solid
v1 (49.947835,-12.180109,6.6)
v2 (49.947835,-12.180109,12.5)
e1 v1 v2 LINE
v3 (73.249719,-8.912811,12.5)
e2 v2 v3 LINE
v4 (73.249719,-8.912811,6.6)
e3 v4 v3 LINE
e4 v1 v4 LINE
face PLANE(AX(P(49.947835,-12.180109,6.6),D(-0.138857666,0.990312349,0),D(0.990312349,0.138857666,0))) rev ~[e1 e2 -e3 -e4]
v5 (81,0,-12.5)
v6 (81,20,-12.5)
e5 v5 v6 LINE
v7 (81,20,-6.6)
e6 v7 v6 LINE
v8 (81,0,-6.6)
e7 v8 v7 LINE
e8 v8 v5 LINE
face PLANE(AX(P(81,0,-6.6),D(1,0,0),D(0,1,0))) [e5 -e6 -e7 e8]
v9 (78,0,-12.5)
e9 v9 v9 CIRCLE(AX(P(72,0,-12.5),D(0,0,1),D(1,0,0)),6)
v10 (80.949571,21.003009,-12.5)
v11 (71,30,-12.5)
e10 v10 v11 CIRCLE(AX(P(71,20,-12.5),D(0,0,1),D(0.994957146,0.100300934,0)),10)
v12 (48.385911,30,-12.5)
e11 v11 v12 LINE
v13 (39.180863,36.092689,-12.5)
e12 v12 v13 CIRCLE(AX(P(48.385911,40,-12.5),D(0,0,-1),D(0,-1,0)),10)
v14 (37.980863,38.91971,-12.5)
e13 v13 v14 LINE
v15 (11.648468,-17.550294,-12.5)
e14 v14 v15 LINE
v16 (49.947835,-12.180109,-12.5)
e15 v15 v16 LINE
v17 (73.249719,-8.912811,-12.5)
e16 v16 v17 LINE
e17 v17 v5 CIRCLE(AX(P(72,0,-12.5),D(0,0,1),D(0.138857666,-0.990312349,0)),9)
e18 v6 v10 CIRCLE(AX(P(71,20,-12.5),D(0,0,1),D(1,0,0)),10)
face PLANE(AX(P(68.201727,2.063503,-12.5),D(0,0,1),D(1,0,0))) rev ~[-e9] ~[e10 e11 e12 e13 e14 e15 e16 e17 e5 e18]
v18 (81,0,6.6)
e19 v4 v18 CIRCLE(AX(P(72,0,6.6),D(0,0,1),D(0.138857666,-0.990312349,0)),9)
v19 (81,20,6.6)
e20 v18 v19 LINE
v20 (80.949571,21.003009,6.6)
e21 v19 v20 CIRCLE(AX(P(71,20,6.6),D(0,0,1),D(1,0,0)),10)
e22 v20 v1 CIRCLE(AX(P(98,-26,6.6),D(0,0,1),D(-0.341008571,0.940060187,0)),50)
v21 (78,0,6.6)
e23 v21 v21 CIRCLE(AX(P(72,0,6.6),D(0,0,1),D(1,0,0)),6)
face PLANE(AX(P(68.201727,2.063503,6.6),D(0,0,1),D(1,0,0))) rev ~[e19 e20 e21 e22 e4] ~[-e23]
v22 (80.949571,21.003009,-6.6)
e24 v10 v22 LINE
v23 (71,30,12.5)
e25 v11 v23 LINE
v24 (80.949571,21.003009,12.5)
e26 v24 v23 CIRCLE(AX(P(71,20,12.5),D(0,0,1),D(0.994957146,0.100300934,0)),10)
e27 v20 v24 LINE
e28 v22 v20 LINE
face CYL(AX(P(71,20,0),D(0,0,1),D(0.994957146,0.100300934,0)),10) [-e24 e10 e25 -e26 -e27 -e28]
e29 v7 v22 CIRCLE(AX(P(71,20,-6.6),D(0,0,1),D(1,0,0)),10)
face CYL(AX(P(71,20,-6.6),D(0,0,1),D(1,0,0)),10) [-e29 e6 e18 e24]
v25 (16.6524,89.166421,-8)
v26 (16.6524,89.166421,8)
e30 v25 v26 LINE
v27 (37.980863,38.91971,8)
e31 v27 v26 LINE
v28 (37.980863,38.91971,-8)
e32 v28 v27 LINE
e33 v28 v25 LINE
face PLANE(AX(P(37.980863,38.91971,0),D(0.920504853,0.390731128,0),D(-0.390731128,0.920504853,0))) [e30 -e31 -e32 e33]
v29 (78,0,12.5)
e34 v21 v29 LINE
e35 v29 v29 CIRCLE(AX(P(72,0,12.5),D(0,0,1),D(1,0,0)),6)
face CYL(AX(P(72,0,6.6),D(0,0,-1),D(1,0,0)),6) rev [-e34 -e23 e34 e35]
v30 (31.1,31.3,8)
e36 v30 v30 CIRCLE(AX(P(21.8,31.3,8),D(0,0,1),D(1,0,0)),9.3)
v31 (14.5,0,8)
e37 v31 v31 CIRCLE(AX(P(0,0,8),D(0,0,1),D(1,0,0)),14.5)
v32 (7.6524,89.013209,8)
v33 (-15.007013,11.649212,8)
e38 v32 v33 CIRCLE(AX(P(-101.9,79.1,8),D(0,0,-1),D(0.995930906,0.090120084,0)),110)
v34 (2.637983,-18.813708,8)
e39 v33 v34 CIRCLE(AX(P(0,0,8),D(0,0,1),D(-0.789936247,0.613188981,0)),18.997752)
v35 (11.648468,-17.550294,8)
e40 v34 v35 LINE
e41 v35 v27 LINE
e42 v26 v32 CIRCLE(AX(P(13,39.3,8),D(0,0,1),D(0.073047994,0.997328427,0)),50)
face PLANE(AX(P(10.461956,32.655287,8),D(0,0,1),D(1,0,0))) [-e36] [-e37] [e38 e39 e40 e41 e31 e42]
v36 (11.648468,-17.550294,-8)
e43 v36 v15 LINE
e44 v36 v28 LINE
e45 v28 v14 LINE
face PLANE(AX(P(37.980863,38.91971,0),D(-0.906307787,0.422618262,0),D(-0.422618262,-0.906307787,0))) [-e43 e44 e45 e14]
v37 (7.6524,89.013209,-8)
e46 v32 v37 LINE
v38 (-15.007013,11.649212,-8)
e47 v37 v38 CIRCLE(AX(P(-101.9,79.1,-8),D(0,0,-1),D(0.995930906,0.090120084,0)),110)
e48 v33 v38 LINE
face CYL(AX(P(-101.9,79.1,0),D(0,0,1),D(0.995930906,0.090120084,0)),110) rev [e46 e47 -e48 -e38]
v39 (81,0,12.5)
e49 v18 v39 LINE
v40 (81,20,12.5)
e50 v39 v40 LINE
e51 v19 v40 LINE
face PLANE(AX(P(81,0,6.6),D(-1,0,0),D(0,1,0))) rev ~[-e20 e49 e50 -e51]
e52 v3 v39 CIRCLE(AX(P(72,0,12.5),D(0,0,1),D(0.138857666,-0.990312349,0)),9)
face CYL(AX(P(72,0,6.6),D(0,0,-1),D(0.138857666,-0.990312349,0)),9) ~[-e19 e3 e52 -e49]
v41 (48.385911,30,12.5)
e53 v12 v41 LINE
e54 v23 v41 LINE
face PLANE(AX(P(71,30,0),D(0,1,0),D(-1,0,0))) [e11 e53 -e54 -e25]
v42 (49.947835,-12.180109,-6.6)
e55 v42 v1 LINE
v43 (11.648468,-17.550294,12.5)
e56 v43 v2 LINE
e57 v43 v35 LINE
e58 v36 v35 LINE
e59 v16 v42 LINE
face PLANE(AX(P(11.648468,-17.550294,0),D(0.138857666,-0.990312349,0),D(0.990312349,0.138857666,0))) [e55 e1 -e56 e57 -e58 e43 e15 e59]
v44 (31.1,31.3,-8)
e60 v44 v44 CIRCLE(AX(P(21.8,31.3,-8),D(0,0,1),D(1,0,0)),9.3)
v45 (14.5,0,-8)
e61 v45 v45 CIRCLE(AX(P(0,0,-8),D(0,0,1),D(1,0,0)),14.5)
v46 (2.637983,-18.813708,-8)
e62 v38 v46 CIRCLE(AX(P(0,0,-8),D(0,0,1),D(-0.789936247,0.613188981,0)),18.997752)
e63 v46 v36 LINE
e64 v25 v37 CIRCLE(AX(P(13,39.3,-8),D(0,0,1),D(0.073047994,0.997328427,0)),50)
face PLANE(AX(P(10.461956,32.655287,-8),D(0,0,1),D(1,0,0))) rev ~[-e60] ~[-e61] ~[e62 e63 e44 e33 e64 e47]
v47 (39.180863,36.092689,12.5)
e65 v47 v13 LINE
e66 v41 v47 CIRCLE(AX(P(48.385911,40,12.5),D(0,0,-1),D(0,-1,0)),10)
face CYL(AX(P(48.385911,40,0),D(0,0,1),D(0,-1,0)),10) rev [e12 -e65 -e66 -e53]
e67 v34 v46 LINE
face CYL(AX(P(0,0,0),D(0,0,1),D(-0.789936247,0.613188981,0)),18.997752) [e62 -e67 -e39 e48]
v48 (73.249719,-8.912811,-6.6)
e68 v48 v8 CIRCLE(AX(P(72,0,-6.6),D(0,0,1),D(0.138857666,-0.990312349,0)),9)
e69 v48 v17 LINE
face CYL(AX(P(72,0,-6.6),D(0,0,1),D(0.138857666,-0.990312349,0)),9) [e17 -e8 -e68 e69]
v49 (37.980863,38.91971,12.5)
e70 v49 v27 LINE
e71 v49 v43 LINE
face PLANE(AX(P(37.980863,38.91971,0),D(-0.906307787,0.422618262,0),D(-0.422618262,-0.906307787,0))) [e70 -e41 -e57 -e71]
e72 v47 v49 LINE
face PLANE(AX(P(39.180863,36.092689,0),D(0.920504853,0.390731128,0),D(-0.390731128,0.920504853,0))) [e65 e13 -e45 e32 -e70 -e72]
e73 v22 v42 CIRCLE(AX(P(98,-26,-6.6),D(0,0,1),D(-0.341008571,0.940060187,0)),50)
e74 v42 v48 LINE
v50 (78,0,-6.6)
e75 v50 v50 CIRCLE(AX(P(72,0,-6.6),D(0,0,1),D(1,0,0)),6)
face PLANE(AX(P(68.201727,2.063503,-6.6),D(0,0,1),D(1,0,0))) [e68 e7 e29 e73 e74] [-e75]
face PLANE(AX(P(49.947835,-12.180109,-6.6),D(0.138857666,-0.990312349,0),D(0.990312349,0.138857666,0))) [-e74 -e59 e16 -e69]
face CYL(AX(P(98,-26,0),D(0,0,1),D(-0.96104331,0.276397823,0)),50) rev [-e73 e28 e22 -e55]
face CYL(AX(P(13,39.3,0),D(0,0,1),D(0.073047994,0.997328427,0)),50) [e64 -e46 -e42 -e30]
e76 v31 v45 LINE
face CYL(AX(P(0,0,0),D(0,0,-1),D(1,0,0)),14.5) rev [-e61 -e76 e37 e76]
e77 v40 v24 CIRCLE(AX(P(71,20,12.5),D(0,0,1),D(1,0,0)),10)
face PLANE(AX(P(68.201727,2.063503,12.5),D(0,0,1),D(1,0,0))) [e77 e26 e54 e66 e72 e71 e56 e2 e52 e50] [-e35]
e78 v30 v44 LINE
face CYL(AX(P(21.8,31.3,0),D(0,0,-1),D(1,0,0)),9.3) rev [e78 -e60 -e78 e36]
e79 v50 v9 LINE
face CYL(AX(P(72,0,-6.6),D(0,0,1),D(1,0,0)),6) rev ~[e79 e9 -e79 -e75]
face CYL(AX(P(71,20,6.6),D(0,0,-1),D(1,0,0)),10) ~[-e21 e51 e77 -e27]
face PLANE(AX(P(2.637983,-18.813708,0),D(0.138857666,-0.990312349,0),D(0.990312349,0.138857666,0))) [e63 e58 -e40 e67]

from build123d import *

# Parameters (mm, degrees)
F0_R     = 14.5
F0_R_2   = 9.3
F1_DEPTH = 8
F2_DEPTH = 12.5
F0_R_3   = 6
F3_DEPTH = 6.6
F4_DEPTH = 5.9
F5_DEPTH = 5.9


with BuildPart() as f1:
    # F0 (on Top) → F1 (new body, symmetric)
    with BuildSketch(Plane.XY):
        with BuildLine():
            Line((2.6379834818, -18.8137083294), (11.6484677091, -17.5502940073))
            Line((11.6484677091, -17.5502940073), (37.9808631577, 38.9197102657))
            Line((37.9808631577, 38.9197102657), (16.6523997132, 89.1664213307))
            ThreePointArc((16.6523997132, 89.1664213307), (12.1489449291, 89.292756528), (7.6523997132, 89.0132092222))
            ThreePointArc((7.6523997132, 89.0132092222), (3.6651197911, 48.1806616582), (-15.0070128486, 11.6492121327))
            ThreePointArc((-15.0070128486, 11.6492121327), (-16.4391484767, -9.5220257988), (2.6379834818, -18.8137083294))
        make_face()
        Circle(F0_R, mode=Mode.SUBTRACT)
        with Locations((21.8, 31.3)):
            Circle(F0_R_2, mode=Mode.SUBTRACT)
    extrude(amount=F1_DEPTH, both=True)

    # F0 (on Top) → F2 (join, symmetric)
    with BuildSketch(Plane.XY):
        with BuildLine():
            Line((11.6484677091, -17.5502940073), (49.9478345026, -12.1801088639))
            ThreePointArc((49.9478345026, -12.1801088639), (61.4641714079, 8.1340479446), (80.9495714617, 21.0030093362))
            ThreePointArc((80.9495714617, 21.0030093362), (77.7070823253, 27.4172128648), (71, 30))
            Line((71, 30), (48.3859111453, 30))
            ThreePointArc((48.3859111453, 30), (42.8665412922, 31.6611417793), (39.1808626108, 36.0926887151))
            Line((39.1808626108, 36.0926887151), (37.9808631577, 38.9197102657))
            Line((37.9808631577, 38.9197102657), (11.6484677091, -17.5502940073))
        make_face()
    extrude(amount=F2_DEPTH, both=True)



with BuildPart() as f3:
    # F0 (on Top) → F3 (new body, symmetric)
    with BuildSketch(Plane.XY):
        with BuildLine():
            Line((49.9478345026, -12.1801088639), (73.2497189898, -8.9128111416))
            ThreePointArc((73.2497189898, -8.9128111416), (78.7914457558, -5.9056129695), (81, 0))
            Line((81, 0), (81, 20))
            ThreePointArc((81, 20), (80.9873849084, 20.5021381199), (80.9495714617, 21.0030093362))
            ThreePointArc((80.9495714617, 21.0030093362), (61.4641714079, 8.1340479446), (49.9478345026, -12.1801088639))
        make_face()
        with Locations((72, 0)):
            Circle(F0_R_3, mode=Mode.SUBTRACT)
    extrude(amount=F3_DEPTH, both=True)


with BuildPart() as f1_1:
    add(f1.part)
    # F4 (add, through all): a face of the model
    f4_faces = [f3.part.faces().sort_by_distance(p)[0] for p in [
        (61.7962542599, 7.8237954492, 6.6),
    ]]
    extrude(f4_faces, amount=F4_DEPTH)

    # F5 (add, through all): a face of the model
    f5_faces = [f3.part.faces().sort_by_distance(p)[0] for p in [
        (61.7962542599, 7.8237954492, -6.6),
    ]]
    extrude(f5_faces, amount=F5_DEPTH)

    # F6: cut F3
    add(f3.part, mode=Mode.SUBTRACT)


solid = f1_1.part
